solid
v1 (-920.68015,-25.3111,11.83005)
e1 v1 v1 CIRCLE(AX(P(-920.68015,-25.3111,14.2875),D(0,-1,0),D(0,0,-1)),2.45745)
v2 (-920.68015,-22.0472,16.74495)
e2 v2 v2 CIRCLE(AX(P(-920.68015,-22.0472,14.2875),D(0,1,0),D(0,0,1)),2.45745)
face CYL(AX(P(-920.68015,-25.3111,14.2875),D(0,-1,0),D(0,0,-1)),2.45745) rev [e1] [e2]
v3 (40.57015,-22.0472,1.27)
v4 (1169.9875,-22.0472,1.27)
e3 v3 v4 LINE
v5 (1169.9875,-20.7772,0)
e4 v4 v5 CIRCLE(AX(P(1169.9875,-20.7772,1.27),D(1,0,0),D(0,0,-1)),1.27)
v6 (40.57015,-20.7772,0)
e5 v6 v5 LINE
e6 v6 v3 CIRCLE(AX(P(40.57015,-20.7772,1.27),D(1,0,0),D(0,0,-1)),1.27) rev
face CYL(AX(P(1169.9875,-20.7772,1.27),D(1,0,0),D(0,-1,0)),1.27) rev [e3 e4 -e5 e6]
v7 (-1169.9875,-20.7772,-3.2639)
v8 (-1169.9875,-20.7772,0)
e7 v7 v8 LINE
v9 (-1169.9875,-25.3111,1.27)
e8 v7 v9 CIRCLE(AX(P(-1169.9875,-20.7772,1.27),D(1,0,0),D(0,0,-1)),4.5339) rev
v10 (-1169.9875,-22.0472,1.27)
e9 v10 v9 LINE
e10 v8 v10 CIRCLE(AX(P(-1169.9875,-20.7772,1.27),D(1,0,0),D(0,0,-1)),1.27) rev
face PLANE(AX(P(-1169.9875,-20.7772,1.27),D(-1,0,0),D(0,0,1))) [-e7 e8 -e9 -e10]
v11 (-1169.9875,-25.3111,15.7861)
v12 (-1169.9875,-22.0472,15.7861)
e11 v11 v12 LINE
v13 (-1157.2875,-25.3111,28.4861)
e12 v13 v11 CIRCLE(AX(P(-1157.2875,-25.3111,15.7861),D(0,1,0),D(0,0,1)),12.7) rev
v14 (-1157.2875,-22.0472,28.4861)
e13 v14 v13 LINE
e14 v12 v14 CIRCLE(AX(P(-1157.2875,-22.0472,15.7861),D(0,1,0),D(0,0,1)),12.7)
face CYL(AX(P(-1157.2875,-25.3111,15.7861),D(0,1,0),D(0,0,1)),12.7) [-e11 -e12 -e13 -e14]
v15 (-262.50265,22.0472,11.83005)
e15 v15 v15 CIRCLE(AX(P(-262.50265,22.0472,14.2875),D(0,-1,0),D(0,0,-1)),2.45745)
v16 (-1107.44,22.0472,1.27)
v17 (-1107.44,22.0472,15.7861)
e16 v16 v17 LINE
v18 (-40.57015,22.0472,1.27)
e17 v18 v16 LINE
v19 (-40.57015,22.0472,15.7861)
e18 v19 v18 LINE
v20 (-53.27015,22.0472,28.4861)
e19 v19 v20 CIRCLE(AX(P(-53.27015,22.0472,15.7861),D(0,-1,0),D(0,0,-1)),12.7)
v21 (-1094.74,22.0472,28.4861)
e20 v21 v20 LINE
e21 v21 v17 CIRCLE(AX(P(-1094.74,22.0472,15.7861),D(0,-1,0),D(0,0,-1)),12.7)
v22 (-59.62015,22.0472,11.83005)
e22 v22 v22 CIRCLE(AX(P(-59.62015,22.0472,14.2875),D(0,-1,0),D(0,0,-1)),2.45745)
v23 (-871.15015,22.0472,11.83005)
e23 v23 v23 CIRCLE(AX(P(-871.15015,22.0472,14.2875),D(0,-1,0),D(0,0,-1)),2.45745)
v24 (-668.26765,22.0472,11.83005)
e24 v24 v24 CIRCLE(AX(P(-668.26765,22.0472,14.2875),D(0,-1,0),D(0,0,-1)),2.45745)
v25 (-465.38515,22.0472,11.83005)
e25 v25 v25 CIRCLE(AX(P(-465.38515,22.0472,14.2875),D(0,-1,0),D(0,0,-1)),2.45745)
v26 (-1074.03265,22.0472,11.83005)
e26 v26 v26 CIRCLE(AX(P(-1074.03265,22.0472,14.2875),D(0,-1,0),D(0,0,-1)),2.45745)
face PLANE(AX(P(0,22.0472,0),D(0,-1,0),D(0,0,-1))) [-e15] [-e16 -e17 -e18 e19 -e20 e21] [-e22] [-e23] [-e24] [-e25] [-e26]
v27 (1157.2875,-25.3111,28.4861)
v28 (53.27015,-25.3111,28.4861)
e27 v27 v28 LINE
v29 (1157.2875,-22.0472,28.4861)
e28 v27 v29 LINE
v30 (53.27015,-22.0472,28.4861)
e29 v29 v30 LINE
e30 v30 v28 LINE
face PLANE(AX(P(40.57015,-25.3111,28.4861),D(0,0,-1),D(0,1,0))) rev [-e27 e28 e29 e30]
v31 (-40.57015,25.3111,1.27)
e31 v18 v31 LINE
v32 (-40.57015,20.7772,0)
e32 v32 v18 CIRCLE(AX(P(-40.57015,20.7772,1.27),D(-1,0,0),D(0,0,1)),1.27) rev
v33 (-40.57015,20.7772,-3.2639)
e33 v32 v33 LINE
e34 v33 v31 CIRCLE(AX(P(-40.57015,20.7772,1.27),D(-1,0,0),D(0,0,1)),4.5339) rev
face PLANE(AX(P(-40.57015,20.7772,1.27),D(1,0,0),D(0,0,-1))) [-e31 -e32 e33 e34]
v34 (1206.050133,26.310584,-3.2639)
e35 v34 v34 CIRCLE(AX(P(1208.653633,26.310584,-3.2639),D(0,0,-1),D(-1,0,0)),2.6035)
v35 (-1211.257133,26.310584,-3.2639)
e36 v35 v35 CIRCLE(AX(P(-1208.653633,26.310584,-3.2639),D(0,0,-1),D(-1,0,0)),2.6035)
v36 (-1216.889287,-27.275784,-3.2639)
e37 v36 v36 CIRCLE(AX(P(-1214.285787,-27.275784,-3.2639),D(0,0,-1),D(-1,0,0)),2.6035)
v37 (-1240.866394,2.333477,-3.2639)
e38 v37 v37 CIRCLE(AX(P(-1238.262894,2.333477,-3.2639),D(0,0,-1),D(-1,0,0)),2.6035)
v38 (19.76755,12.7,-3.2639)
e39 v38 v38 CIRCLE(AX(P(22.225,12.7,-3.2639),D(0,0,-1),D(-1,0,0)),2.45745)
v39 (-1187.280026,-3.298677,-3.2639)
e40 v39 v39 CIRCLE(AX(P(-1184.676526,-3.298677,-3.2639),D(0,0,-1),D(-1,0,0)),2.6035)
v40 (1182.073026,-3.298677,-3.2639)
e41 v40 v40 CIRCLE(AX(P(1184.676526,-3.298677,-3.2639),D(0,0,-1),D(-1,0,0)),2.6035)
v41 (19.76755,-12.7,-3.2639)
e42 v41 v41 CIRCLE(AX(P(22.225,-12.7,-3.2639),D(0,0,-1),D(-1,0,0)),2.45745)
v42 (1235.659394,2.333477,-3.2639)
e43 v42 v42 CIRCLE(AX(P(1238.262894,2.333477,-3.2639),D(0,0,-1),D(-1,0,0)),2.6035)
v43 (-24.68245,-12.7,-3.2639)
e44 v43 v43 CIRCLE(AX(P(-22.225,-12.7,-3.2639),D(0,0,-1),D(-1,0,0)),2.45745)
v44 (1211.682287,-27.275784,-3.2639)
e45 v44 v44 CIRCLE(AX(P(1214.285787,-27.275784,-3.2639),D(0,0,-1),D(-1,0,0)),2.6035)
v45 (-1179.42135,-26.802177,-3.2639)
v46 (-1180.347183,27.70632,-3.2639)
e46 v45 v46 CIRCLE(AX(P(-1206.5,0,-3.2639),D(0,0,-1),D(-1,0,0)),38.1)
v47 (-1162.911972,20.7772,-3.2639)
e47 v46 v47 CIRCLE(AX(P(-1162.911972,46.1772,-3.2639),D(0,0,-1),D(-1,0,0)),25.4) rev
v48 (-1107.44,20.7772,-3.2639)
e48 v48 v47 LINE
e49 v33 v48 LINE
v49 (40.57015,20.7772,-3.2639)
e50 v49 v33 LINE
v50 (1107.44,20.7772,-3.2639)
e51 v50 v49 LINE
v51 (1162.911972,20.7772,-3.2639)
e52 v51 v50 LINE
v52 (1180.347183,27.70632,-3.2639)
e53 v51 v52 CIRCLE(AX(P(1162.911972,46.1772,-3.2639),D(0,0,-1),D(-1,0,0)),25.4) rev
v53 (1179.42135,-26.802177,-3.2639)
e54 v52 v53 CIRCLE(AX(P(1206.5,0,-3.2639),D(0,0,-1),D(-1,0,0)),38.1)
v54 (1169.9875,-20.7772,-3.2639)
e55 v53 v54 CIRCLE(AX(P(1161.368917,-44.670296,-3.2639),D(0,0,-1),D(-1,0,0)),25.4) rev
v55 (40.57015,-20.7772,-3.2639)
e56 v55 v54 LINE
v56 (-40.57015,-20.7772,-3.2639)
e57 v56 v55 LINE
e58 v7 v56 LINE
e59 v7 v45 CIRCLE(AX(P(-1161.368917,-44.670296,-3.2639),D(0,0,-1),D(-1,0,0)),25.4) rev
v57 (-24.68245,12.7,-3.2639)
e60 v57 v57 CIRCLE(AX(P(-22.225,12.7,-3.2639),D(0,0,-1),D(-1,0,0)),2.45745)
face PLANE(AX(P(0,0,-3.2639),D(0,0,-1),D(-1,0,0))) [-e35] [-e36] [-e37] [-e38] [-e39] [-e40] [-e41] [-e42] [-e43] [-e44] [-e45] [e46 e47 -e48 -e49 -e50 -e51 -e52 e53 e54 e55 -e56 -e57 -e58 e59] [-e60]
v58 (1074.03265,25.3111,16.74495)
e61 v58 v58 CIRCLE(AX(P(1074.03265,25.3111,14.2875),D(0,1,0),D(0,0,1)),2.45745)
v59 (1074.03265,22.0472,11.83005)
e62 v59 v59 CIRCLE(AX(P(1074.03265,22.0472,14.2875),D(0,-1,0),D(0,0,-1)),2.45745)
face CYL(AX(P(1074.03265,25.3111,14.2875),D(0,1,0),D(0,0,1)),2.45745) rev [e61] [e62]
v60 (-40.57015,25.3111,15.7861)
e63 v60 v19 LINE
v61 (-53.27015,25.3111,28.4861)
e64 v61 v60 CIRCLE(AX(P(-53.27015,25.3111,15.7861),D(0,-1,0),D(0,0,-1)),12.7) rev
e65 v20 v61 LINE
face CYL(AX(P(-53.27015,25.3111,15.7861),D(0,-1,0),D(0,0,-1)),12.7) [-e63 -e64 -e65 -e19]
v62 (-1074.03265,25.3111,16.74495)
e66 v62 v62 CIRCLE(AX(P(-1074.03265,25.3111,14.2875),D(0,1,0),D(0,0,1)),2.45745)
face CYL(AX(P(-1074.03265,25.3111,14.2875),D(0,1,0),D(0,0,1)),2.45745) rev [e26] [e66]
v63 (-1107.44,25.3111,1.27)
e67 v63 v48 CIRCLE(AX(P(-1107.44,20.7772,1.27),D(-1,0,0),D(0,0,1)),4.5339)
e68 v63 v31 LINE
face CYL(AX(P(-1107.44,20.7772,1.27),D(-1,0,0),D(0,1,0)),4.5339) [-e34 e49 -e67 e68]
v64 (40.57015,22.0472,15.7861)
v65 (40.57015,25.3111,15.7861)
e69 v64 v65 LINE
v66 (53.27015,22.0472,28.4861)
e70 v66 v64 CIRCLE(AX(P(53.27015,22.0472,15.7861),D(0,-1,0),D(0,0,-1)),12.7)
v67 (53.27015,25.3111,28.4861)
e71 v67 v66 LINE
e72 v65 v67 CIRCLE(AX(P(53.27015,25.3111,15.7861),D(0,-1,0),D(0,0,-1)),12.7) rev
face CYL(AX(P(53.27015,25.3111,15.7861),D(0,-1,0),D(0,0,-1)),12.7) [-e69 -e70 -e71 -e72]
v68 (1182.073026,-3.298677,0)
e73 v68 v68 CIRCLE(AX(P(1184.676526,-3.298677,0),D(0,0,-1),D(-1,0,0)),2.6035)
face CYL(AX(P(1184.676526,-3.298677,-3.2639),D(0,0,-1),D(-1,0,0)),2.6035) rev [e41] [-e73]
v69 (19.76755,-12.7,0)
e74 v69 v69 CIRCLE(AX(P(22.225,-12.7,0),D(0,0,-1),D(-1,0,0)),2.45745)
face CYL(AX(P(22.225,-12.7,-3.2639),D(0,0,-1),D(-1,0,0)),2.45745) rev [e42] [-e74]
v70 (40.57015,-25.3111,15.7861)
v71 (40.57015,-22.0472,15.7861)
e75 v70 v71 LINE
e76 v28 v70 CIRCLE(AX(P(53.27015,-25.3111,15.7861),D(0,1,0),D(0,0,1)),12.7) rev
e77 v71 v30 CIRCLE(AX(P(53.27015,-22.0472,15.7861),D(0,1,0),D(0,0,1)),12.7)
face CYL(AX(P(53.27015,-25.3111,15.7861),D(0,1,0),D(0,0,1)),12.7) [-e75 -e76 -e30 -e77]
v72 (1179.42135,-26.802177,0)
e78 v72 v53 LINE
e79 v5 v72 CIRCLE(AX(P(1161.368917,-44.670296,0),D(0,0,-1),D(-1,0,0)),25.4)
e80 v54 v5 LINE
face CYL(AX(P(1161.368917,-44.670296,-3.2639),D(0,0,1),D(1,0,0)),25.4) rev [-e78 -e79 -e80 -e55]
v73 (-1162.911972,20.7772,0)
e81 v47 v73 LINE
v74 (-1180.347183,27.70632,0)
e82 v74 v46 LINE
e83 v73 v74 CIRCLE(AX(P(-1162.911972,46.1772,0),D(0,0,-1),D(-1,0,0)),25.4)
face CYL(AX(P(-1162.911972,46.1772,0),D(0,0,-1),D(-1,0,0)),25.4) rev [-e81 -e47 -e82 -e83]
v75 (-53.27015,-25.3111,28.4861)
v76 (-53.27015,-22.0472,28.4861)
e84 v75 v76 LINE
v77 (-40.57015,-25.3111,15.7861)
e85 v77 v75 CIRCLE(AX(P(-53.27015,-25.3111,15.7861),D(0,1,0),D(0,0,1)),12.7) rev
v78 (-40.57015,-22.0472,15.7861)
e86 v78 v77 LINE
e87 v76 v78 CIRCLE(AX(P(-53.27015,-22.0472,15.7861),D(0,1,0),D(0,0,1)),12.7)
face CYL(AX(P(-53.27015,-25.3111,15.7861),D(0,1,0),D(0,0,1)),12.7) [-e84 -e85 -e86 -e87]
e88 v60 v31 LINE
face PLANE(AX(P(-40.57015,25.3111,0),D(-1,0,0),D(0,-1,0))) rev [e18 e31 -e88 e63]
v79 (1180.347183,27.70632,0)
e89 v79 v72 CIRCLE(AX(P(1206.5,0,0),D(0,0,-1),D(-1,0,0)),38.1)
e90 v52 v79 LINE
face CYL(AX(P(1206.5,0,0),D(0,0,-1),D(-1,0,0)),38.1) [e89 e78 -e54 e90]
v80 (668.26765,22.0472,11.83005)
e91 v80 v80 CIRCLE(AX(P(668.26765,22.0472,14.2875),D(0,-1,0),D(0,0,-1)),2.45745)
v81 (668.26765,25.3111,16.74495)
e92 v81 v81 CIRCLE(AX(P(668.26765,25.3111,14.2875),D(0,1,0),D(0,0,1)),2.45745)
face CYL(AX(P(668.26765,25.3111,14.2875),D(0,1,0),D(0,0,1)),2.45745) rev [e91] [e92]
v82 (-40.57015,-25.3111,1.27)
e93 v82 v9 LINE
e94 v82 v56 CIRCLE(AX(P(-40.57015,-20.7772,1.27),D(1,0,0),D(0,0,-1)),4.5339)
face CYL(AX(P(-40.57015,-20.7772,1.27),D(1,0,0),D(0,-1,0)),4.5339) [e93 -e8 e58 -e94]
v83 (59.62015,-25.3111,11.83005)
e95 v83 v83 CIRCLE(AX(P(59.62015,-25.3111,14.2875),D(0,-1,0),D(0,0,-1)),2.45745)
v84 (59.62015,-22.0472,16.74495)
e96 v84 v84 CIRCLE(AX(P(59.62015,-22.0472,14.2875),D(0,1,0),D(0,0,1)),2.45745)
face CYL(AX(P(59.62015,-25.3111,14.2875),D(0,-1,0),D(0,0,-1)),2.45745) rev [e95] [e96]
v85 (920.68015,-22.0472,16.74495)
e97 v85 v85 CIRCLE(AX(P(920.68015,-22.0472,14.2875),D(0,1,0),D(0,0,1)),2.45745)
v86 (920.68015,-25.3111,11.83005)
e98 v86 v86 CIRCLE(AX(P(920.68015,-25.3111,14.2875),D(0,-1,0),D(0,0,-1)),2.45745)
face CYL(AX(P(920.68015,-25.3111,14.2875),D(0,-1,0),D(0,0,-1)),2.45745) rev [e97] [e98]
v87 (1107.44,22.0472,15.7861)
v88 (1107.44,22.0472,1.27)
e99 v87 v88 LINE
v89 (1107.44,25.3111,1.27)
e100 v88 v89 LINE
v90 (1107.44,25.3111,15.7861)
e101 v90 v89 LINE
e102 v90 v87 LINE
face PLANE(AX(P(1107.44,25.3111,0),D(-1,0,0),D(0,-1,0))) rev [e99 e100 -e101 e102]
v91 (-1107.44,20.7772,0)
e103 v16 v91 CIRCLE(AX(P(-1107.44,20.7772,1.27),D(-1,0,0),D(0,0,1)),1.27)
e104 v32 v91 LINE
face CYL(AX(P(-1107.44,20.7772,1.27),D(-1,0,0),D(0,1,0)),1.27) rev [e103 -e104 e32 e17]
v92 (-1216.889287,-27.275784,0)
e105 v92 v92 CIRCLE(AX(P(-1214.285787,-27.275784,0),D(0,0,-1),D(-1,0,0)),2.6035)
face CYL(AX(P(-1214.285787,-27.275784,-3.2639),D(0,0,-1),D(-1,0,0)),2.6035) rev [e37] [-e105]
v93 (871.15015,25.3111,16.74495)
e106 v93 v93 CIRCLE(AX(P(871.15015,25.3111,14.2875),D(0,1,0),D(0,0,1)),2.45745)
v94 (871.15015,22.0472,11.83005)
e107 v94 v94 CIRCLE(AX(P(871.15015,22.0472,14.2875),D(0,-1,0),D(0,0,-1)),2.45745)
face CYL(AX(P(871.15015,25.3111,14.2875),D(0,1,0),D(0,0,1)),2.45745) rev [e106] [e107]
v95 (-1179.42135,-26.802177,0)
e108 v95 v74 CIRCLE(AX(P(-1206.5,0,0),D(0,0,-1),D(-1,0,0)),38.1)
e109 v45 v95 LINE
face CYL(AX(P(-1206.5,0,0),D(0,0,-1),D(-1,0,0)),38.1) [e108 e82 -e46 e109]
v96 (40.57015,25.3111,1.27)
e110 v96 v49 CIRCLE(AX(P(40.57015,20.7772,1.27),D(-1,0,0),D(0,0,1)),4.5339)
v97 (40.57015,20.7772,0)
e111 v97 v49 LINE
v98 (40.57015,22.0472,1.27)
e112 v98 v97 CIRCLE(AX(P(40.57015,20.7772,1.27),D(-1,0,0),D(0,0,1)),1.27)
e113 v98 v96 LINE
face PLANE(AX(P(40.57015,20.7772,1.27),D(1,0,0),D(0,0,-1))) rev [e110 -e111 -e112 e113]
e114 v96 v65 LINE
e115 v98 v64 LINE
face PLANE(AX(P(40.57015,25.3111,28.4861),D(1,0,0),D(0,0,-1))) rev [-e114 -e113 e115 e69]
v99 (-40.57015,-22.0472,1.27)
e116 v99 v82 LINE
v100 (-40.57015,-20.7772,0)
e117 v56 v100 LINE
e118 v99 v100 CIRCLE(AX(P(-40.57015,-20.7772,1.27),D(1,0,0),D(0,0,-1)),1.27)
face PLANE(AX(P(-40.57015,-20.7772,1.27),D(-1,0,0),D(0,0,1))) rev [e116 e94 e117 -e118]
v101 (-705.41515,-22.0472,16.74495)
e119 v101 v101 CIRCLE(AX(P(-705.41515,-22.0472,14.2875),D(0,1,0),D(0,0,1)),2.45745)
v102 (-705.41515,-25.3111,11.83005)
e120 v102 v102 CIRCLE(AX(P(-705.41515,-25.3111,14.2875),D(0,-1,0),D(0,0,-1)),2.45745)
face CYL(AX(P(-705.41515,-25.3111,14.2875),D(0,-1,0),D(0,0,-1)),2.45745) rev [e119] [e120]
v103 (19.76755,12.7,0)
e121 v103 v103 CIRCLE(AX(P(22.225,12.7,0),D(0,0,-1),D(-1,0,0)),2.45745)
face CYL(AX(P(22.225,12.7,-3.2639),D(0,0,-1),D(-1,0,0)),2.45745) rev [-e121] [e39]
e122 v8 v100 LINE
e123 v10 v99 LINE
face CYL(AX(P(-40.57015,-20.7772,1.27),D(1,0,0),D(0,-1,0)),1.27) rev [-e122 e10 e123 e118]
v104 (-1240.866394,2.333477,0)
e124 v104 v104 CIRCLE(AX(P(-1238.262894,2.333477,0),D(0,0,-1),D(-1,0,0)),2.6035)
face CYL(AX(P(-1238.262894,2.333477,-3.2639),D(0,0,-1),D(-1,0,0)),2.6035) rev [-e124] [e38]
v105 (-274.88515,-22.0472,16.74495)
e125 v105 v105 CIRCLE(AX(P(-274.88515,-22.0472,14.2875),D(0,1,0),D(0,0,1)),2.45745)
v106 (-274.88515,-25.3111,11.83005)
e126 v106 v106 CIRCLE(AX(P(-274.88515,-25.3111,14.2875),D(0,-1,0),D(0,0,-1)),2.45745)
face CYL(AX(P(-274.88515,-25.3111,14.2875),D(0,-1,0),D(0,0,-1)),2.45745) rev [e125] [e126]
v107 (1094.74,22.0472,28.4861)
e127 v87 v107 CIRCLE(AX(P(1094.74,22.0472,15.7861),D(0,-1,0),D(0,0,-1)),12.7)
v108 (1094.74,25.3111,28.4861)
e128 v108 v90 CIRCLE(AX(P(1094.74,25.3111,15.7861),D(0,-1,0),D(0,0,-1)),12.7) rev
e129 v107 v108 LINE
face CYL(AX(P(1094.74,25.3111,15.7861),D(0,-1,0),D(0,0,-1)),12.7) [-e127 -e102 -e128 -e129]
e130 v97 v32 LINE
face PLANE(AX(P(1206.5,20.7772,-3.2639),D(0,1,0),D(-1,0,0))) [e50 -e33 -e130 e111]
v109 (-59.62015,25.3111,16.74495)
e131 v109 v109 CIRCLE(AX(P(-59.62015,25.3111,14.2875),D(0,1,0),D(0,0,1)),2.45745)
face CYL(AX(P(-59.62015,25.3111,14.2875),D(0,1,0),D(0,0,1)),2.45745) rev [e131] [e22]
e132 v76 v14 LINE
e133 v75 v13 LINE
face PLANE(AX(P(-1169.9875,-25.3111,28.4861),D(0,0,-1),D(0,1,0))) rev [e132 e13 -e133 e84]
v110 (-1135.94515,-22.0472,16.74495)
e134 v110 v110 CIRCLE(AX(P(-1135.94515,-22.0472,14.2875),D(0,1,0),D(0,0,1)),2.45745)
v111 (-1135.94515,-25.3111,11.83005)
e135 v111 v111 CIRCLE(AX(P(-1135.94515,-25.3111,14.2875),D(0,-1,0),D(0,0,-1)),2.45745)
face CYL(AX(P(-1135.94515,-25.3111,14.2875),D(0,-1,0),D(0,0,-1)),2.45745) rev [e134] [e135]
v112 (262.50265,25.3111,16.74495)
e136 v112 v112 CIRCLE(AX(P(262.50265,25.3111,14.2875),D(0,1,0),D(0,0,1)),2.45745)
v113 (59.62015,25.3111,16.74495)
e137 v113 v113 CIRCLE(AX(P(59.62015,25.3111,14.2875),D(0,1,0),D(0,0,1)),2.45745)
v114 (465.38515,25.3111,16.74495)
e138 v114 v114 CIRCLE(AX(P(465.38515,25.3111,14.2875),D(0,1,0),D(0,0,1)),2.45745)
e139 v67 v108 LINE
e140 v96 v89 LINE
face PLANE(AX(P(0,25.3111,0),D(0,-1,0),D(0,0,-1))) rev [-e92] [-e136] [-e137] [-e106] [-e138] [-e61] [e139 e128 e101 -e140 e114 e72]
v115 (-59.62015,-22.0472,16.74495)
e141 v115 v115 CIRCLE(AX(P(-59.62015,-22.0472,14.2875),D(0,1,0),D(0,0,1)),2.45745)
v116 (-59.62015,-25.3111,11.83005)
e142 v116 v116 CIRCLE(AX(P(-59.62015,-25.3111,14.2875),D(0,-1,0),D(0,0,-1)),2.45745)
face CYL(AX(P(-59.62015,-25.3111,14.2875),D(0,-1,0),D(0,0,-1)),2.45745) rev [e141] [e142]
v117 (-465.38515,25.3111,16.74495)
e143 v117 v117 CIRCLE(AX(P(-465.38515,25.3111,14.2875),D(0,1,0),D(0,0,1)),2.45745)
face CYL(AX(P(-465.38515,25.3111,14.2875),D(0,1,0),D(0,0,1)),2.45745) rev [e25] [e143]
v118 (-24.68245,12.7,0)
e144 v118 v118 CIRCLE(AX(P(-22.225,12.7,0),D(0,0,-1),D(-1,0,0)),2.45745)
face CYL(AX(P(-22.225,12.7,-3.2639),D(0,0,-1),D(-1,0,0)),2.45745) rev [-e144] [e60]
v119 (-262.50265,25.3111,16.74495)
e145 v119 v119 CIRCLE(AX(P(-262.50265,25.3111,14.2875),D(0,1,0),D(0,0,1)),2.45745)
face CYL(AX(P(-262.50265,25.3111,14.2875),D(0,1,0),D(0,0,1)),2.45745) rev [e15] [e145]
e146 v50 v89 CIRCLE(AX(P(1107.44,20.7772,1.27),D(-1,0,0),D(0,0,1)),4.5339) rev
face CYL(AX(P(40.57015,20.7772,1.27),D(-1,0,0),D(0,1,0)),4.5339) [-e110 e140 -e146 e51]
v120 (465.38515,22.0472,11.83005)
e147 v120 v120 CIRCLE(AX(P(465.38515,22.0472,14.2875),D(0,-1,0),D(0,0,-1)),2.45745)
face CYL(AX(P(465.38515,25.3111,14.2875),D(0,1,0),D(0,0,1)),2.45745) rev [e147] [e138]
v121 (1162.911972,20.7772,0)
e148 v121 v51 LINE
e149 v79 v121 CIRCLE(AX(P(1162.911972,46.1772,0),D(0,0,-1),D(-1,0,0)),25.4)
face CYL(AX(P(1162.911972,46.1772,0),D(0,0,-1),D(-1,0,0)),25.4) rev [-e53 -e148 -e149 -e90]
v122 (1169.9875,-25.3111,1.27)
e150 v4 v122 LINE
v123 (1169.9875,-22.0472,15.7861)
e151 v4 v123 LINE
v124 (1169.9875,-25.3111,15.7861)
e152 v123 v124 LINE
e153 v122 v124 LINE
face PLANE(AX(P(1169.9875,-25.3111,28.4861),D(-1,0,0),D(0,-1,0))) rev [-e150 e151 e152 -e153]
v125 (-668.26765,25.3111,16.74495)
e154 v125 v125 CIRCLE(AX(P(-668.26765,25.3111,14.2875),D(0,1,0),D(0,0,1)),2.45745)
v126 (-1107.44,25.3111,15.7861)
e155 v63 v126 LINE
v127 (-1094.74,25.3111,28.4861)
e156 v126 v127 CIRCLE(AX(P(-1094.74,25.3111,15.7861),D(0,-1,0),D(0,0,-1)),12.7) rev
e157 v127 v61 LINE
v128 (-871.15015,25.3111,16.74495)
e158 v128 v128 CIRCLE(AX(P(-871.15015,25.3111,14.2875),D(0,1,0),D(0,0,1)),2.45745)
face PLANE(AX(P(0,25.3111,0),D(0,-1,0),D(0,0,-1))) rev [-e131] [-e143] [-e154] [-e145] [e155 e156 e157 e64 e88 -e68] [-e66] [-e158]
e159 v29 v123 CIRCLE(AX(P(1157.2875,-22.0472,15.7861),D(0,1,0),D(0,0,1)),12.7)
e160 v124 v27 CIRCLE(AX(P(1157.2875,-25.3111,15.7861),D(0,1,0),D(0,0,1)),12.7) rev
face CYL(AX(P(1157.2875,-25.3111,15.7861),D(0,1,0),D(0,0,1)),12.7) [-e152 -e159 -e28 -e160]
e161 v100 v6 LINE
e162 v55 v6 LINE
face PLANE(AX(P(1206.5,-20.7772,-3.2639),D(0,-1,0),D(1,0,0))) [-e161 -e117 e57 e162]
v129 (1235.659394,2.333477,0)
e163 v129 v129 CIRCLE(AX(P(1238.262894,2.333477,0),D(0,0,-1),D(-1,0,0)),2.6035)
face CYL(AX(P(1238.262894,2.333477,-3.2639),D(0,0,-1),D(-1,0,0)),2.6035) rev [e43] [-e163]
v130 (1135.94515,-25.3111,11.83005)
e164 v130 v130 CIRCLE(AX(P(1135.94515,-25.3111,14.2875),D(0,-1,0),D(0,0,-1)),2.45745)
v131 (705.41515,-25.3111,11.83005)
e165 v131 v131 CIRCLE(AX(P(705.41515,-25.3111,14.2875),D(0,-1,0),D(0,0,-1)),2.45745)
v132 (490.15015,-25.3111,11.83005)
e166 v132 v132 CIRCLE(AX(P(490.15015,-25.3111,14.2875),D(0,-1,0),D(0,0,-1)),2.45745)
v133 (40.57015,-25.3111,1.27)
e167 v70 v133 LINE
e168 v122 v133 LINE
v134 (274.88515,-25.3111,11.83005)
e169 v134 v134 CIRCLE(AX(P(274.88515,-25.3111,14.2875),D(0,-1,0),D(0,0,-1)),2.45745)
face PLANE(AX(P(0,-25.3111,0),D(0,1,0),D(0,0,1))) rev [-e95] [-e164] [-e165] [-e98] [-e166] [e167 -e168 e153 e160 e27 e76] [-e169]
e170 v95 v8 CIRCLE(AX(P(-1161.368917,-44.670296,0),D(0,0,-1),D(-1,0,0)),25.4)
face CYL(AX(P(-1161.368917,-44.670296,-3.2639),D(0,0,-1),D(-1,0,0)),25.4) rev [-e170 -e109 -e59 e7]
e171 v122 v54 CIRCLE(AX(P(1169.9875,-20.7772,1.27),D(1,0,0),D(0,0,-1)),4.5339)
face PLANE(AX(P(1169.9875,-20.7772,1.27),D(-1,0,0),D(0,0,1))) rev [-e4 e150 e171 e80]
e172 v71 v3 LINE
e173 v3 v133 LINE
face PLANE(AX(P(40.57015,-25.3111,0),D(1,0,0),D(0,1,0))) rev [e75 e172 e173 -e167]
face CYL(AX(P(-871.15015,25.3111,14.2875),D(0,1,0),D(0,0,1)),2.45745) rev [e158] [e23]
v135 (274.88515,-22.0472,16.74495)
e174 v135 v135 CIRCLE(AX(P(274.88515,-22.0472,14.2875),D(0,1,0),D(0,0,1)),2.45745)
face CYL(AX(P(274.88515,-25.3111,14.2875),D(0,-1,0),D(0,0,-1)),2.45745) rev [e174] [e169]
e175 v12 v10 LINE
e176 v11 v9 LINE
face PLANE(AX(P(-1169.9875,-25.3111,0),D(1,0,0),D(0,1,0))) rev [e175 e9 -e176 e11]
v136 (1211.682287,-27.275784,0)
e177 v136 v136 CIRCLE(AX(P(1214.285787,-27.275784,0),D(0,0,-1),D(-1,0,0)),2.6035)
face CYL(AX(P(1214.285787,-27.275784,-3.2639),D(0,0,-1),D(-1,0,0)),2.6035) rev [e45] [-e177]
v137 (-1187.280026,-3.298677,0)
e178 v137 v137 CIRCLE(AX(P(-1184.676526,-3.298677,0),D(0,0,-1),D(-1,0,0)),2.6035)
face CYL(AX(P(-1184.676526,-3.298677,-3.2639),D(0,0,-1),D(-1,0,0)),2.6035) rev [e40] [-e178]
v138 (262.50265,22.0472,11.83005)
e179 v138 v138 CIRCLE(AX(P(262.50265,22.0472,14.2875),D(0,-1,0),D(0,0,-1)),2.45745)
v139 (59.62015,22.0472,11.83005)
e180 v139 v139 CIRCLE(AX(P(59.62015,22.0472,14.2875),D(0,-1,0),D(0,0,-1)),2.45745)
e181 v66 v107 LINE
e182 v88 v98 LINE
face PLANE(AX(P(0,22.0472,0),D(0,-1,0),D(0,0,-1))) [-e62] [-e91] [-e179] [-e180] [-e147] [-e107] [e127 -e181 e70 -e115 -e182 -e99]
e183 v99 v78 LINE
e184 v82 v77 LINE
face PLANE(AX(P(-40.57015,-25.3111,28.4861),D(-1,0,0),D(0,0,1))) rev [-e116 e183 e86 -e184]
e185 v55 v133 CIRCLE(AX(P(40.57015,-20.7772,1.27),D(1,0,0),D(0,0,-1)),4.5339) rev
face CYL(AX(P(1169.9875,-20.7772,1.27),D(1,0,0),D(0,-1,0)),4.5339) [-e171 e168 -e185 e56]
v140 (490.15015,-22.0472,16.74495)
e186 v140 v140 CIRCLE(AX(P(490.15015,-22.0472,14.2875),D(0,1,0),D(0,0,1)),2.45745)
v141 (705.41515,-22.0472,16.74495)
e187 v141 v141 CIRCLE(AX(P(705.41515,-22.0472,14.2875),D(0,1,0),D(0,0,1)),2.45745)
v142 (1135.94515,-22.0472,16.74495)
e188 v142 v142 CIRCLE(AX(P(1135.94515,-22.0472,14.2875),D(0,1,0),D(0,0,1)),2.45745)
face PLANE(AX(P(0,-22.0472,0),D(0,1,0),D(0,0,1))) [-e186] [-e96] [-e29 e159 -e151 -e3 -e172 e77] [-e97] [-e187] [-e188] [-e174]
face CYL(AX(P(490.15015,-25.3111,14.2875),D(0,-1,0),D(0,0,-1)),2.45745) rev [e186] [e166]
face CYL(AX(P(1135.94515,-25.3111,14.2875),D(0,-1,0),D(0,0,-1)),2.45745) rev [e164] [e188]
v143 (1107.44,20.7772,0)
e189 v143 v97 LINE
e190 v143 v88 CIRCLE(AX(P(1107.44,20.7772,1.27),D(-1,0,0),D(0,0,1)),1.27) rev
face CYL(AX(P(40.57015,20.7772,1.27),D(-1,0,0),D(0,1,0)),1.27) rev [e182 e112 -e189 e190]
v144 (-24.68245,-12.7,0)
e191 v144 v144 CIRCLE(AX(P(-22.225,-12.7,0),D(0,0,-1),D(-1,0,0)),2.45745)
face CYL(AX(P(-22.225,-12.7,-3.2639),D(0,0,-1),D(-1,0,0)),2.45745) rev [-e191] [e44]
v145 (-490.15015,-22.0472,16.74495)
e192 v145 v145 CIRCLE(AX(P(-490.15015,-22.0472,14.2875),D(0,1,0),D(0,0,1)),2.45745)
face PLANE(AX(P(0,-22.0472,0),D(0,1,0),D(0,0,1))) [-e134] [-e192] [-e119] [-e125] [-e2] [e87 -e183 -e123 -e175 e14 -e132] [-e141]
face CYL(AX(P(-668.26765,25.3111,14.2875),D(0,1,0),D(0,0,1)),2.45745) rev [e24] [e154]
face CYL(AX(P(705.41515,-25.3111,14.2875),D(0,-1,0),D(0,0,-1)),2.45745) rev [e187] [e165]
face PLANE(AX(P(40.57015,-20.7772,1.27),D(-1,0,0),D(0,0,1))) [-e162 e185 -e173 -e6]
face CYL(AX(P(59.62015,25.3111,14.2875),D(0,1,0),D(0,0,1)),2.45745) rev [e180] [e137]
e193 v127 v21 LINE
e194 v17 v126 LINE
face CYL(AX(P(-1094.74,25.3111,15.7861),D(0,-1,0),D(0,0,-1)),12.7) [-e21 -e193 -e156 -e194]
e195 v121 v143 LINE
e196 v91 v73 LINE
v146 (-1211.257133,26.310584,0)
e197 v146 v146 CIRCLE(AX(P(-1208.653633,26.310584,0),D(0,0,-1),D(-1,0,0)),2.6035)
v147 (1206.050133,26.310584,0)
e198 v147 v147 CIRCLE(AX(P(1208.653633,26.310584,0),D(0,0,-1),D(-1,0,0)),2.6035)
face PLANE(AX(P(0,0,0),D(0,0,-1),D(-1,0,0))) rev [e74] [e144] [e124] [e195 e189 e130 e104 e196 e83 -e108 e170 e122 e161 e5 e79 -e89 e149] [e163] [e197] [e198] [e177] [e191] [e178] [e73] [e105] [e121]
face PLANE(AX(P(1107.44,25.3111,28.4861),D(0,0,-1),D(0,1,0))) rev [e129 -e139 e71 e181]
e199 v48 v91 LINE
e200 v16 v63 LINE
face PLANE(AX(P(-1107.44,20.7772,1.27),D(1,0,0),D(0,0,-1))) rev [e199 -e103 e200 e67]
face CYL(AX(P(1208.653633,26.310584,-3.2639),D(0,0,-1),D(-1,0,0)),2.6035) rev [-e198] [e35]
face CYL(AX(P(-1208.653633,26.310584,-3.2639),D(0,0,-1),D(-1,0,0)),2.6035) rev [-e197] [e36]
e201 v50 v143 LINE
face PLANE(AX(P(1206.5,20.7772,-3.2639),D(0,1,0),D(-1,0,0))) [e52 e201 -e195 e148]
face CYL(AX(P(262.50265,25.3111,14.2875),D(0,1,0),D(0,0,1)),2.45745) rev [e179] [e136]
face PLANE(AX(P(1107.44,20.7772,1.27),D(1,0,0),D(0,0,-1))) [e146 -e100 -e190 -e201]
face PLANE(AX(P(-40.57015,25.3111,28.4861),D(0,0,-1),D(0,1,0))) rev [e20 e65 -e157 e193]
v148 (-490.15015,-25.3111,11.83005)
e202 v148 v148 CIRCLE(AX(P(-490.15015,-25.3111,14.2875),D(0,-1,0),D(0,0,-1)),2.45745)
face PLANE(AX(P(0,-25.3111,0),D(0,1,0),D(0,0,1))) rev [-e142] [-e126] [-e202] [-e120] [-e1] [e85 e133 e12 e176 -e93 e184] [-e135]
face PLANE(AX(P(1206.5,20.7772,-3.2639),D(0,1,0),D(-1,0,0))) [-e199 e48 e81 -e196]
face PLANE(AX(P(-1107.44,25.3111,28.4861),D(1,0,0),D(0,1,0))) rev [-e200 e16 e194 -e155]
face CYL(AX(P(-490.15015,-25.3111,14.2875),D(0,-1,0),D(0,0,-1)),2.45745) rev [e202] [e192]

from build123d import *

# Parameters (mm, degrees)
SKETCH1_W                        = 2413
SKETCH1_H                        = 41.5544
BASE_FLANGE1_DEPTH               = 3.2639
SKETCH66_R                       = 38.1
BOSS_EXTRUDE1_DEPTH              = 3.2639
EDGE_FLANGE1_DEPTH               = 1129.41735
EDGE_FLANGE1_BEND_DEPTH          = 1066.86985
EDGE_FLANGE1_BEND_2_DEPTH        = 1066.86985
EDGE_FLANGE1_BEND_3_DEPTH        = 1129.41735
F_10_0_1935_DIAMETER_HOLE1_D     = 4.9149
F_10_0_1935_DIAMETER_HOLE1_DEPTH = 3.2649
LPATTERN1_COUNT                  = 6
LPATTERN1_PITCH                  = 215.265
F_10_0_1935_DIAMETER_HOLE2_D     = 4.9149
LPATTERN2_START                  = 22.0472
LPATTERN2_OUTLINE_R              = 2.45745
LPATTERN2_DEPTH                  = 3.2639
MIRROR1_COPY_1_D                 = 4.9149
MIRROR1_COPY_1_DEPTH             = 3.2649
MIRROR1_COPY_2_D                 = 4.9149
MIRROR1_COPY_2_DEPTH             = 3.2649
MIRROR1_COPY_3_D                 = 4.9149
MIRROR1_COPY_3_DEPTH             = 3.2649
MIRROR1_COPY_4_D                 = 4.9149
MIRROR1_COPY_4_DEPTH             = 3.2649
MIRROR1_COPY_5_D                 = 4.9149
MIRROR1_COPY_5_DEPTH             = 3.2649
F_10_0_1935_DIAMETER_HOLE4_D     = 4.9149
F_3_16_0_205_DOWEL_HOLE1_D       = 5.207
FILLET1_R                        = 25.4
FILLET2_R                        = 12.7


# Read off the part's stored shape, not the designer's step: LPattern2
# Sheet-metal steps are written as plain solids
with BuildPart() as part:
    # Sketch1 → Base-Flange1 (new body)
    with BuildSketch(Plane.XY):
        Rectangle(SKETCH1_W, SKETCH1_H)
    extrude(amount=-BASE_FLANGE1_DEPTH)

    # Sketch66 → Boss-Extrude1 (add, through all)
    with BuildSketch(Plane(origin=(0, 0, -3.2639), x_dir=(-1, 0, 0), z_dir=(0, 0, -1))):
        with Locations((-1206.5, 0)):
            Circle(SKETCH66_R)
        with Locations((1206.5, 0)):
            Circle(SKETCH66_R)
    extrude(amount=-BOSS_EXTRUDE1_DEPTH)

    # Edge-Flange1 section (across the edge) → Edge-Flange1 (add)
    with BuildSketch(Plane(origin=(-1169.9875, -22.0472, 0), x_dir=(0, 1, 0), z_dir=(1, 0, 0))):
        with BuildLine():
            Line((-3.2639, 1.27), (-3.2639, 28.4861))
            Line((-3.2639, 28.4861), (0, 28.4861))
            Line((0, 28.4861), (0, 1.27))
            ThreePointArc((0, 1.27), (0.371974388, 0.371974388), (1.27, 0))
            Line((1.27, 0), (1.27, -3.2639))
            ThreePointArc((1.27, -3.2639), (-1.935951435, -1.935951435), (-3.2639, 1.27))
        make_face()
    extrude(amount=EDGE_FLANGE1_DEPTH)

    # Edge-Flange1 section 2 (across the edge) → Edge-Flange1 bend (add)
    with BuildSketch(Plane(origin=(-40.57015, 22.0472, 0), x_dir=(0, -1, 0), z_dir=(-1, 0, 0))):
        with BuildLine():
            Line((-3.2639, 1.27), (-3.2639, 28.4861))
            Line((-3.2639, 28.4861), (0, 28.4861))
            Line((0, 28.4861), (0, 1.27))
            ThreePointArc((0, 1.27), (0.371974388, 0.371974388), (1.27, 0))
            Line((1.27, 0), (1.27, -3.2639))
            ThreePointArc((1.27, -3.2639), (-1.935951435, -1.935951435), (-3.2639, 1.27))
        make_face()
    extrude(amount=EDGE_FLANGE1_BEND_DEPTH)

    # Edge-Flange1 section 3 (across the edge) → Edge-Flange1 bend 2 (add)
    with BuildSketch(Plane(origin=(1107.44, 22.0472, 0), x_dir=(0, -1, 0), z_dir=(-1, 0, 0))):
        with BuildLine():
            Line((-3.2639, 1.27), (-3.2639, 28.4861))
            Line((-3.2639, 28.4861), (0, 28.4861))
            Line((0, 28.4861), (0, 1.27))
            ThreePointArc((0, 1.27), (0.371974388, 0.371974388), (1.27, 0))
            Line((1.27, 0), (1.27, -3.2639))
            ThreePointArc((1.27, -3.2639), (-1.935951435, -1.935951435), (-3.2639, 1.27))
        make_face()
    extrude(amount=EDGE_FLANGE1_BEND_2_DEPTH)

    # Edge-Flange1 section 4 (across the edge) → Edge-Flange1 bend 3 (add)
    with BuildSketch(Plane(origin=(40.57015, -22.0472, 0), x_dir=(0, 1, 0), z_dir=(1, 0, 0))):
        with BuildLine():
            Line((-3.2639, 1.27), (-3.2639, 28.4861))
            Line((-3.2639, 28.4861), (0, 28.4861))
            Line((0, 28.4861), (0, 1.27))
            ThreePointArc((0, 1.27), (0.371974388, 0.371974388), (1.27, 0))
            Line((1.27, 0), (1.27, -3.2639))
            ThreePointArc((1.27, -3.2639), (-1.935951435, -1.935951435), (-3.2639, 1.27))
        make_face()
    extrude(amount=EDGE_FLANGE1_BEND_3_DEPTH)

    # #10 (0.1935) Diameter Hole1
    with Locations(Plane(origin=(0, -25.3111, 0), x_dir=(-1, 0, 0), z_dir=(0, -1, 0))):
        with Locations((59.62015, -14.2875)):
            f_10_0_1935_diameter_hole1 = Hole(F_10_0_1935_DIAMETER_HOLE1_D / 2, depth=F_10_0_1935_DIAMETER_HOLE1_DEPTH)

    # LPattern1: #10 (0.1935) Diameter Hole1 ×6
    with Locations(*[(-i * LPATTERN1_PITCH, 0, 0) for i in range(1, LPATTERN1_COUNT)]):
        add(f_10_0_1935_diameter_hole1, mode=Mode.SUBTRACT)

    # #10 (0.1935) Diameter Hole2 (through all)
    with Locations(Plane(origin=(0, 25.3111, 0), x_dir=(1, 0, 0), z_dir=(0, 1, 0))):
        with Locations((-59.62015, -14.2875)):
            f_10_0_1935_diameter_hole2 = Hole(F_10_0_1935_DIAMETER_HOLE2_D / 2)

    # LPattern2 outline → LPattern2 (cut)
    with BuildSketch(Plane(origin=(0, 0, 0), x_dir=(1, 0, 0), z_dir=(0, 1, 0)).offset(LPATTERN2_START)):
        with Locations((-1074.03265, -14.2875)):
            Circle(LPATTERN2_OUTLINE_R)
        with Locations((-871.15015, -14.2875)):
            Circle(LPATTERN2_OUTLINE_R)
        with Locations((-668.26765, -14.2875)):
            Circle(LPATTERN2_OUTLINE_R)
        with Locations((-465.38515, -14.2875)):
            Circle(LPATTERN2_OUTLINE_R)
        with Locations((-262.50265, -14.2875)):
            Circle(LPATTERN2_OUTLINE_R)
    lpattern2 = extrude(amount=LPATTERN2_DEPTH, mode=Mode.SUBTRACT)

    # Mirror1: #10 (0.1935) Diameter Hole1, #10 (0.1935) Diameter Hole2, LPattern2 across plane
    add(f_10_0_1935_diameter_hole1.mirror(Plane(origin=(0, 0, 0), x_dir=(0, 0, 1), z_dir=(1, 0, 0))), mode=Mode.SUBTRACT)
    add(f_10_0_1935_diameter_hole2.mirror(Plane(origin=(0, 0, 0), x_dir=(0, 0, 1), z_dir=(1, 0, 0))), mode=Mode.SUBTRACT)
    add(lpattern2.mirror(Plane(origin=(0, 0, 0), x_dir=(0, 0, 1), z_dir=(1, 0, 0))), mode=Mode.SUBTRACT)

    # Mirror1 copy 1
    with Locations(Plane(origin=(215.265, -25.3111, 0), x_dir=(1, 0, 0), z_dir=(0, -1, 0))):
        with Locations((59.62015, 14.2875)):
            Hole(MIRROR1_COPY_1_D / 2, depth=MIRROR1_COPY_1_DEPTH)

    # Mirror1 copy 2
    with Locations(Plane(origin=(430.53, -25.3111, 0), x_dir=(1, 0, 0), z_dir=(0, -1, 0))):
        with Locations((59.62015, 14.2875)):
            Hole(MIRROR1_COPY_2_D / 2, depth=MIRROR1_COPY_2_DEPTH)

    # Mirror1 copy 3
    with Locations(Plane(origin=(645.795, -25.3111, 0), x_dir=(1, 0, 0), z_dir=(0, -1, 0))):
        with Locations((59.62015, 14.2875)):
            Hole(MIRROR1_COPY_3_D / 2, depth=MIRROR1_COPY_3_DEPTH)

    # Mirror1 copy 4
    with Locations(Plane(origin=(861.06, -25.3111, 0), x_dir=(1, 0, 0), z_dir=(0, -1, 0))):
        with Locations((59.62015, 14.2875)):
            Hole(MIRROR1_COPY_4_D / 2, depth=MIRROR1_COPY_4_DEPTH)

    # Mirror1 copy 5
    with Locations(Plane(origin=(1076.325, -25.3111, 0), x_dir=(1, 0, 0), z_dir=(0, -1, 0))):
        with Locations((59.62015, 14.2875)):
            Hole(MIRROR1_COPY_5_D / 2, depth=MIRROR1_COPY_5_DEPTH)

    # #10 (0.1935) Diameter Hole4 (through all)
    with Locations(Plane(origin=(0, 0, -3.2639), x_dir=(-1, 0, 0), z_dir=(0, 0, -1))):
        with Locations((-22.225, 12.7), (-22.225, -12.7), (22.225, -12.7), (22.225, 12.7)):
            Hole(F_10_0_1935_DIAMETER_HOLE4_D / 2)

    # 3/16 (0.205) Dowel Hole1 (through all)
    with Locations(Plane(origin=(0, 0, -3.2639), x_dir=(-1, 0, 0), z_dir=(0, 0, -1))):
        with Locations((-1208.653632912, 26.310584015), (-1184.676526013, -3.298677116), (-1214.285787144, -27.275784015), (-1238.262894043, 2.333477116)):
            f_3_16_0_205_dowel_hole1 = Hole(F_3_16_0_205_DOWEL_HOLE1_D / 2)

    # Mirror2: 3/16 (0.205) Dowel Hole1 across plane
    add(f_3_16_0_205_dowel_hole1.mirror(Plane(origin=(0, 0, 0), x_dir=(0, 0, 1), z_dir=(1, 0, 0))), mode=Mode.SUBTRACT)

    # Fillet1
    # the kernel refuses this fillet: 25.4 mm, written as the material it adds along each edge
    with BuildSketch(Plane(origin=(1174.563845564, -20.7772, 0), x_dir=(0.6276468815882087, -0.778498164437526, 0), z_dir=(0, 0, -1))) as fillet1_piece_1:
        with BuildLine():
            CenterArc((10.318975145, 25.268654931), FILLET1_R, 238.711829653, 25.458889439)
            Line((-2.872329022, 3.562676621), (-3.136155106, 3.128557055))
            ThreePointArc((-3.136155106, 3.128557055), (-1.831641579, 1.462493695), (-0.395477068, -0.318844616))
            Line((-0.395477068, -0.318844616), (0.051594876, -0.505373099))
            ThreePointArc((0.051594876, -0.505373099), (3.86961568, -0.310982396), (7.687636483, -0.505373099))
            Line((7.687636483, -0.505373099), (7.739231359, 0))
        make_face()
    extrude(amount=3.2639)
    with BuildSketch(Plane(origin=(1174.563845564, 20.7772, 0), x_dir=(0.640777338935112, 0.7677267755570576, 0), z_dir=(0, 0, -1))) as fillet1_piece_2:
        with BuildLine():
            CenterArc((12.034003451, -25.221199864), FILLET1_R, 96.802362748, 43.347829096)
            Line((-7.466256648, -8.945455455), (-7.85626185, -8.619940566))
            Line((-7.85626185, -8.619940566), (-0.390005202, 0.325514888))
            Line((-0.390005202, 0.325514888), (0.060170017, 0.504423997))
            ThreePointArc((0.060170017, 0.504423997), (4.512751294, 0.239799795), (8.965332571, 0.504423997))
            Line((8.965332571, 0.504423997), (9.025502588, 0))
        make_face()
    extrude(amount=3.2639)
    with BuildSketch(Plane(origin=(-1174.563845564, 20.7772, 0), x_dir=(1, 0, 0), z_dir=(0, 0, -1))) as fillet1_piece_3:
        with BuildLine():
            CenterArc((11.651873739, -25.4), FILLET1_R, 90, 43.347829096)
            Line((-5.783337531, -6.92912), (-6.132041757, -6.5597024))
            ThreePointArc((-6.132041757, -6.5597024), (-3.075769489, -3.310901725), (-0.425815392, 0.277029333))
            Line((-0.425815392, 0.277029333), (0, 0.508))
            Line((0, 0.508), (11.651873739, 0.508))
            Line((11.651873739, 0.508), (11.651873739, 0))
        make_face()
    extrude(amount=3.2639)
    with BuildSketch(Plane(origin=(-1174.563845564, -20.7772, 0), x_dir=(1, 0, 0), z_dir=(0, 0, -1))) as fillet1_piece_4:
        with BuildLine():
            CenterArc((13.19492891, 23.893095679), FILLET1_R, 224.706007222, 25.458889439)
            Line((-4.857504428, 6.024977407), (-5.218553095, 5.667615042))
            ThreePointArc((-5.218553095, 5.667615042), (-2.670851438, 2.817301573), (-0.425815392, -0.277029333))
            Line((-0.425815392, -0.277029333), (0, -0.508))
            ThreePointArc((0, -0.508), (2.288172782, -0.508), (4.403973897, -0.477861914))
            Line((4.403973897, -0.477861914), (4.576345564, 0))
        make_face()
    extrude(amount=3.2639)

    # Fillet2
    fillet2_edges = [part.edges().sort_by_distance(p)[0] for p in [
        (1107.44, 23.67915, 28.4861),
        (40.57015, 23.67915, 28.4861),
        (40.57015, -23.67915, 28.4861),
        (1169.9875, -23.67915, 28.4861),
        (-1169.9875, -23.67915, 28.4861),
        (-40.57015, -23.67915, 28.4861),
        (-40.57015, 23.67915, 28.4861),
        (-1107.44, 23.67915, 28.4861),
    ]]
    fillet(fillet2_edges, radius=FILLET2_R)


solid = part.part
